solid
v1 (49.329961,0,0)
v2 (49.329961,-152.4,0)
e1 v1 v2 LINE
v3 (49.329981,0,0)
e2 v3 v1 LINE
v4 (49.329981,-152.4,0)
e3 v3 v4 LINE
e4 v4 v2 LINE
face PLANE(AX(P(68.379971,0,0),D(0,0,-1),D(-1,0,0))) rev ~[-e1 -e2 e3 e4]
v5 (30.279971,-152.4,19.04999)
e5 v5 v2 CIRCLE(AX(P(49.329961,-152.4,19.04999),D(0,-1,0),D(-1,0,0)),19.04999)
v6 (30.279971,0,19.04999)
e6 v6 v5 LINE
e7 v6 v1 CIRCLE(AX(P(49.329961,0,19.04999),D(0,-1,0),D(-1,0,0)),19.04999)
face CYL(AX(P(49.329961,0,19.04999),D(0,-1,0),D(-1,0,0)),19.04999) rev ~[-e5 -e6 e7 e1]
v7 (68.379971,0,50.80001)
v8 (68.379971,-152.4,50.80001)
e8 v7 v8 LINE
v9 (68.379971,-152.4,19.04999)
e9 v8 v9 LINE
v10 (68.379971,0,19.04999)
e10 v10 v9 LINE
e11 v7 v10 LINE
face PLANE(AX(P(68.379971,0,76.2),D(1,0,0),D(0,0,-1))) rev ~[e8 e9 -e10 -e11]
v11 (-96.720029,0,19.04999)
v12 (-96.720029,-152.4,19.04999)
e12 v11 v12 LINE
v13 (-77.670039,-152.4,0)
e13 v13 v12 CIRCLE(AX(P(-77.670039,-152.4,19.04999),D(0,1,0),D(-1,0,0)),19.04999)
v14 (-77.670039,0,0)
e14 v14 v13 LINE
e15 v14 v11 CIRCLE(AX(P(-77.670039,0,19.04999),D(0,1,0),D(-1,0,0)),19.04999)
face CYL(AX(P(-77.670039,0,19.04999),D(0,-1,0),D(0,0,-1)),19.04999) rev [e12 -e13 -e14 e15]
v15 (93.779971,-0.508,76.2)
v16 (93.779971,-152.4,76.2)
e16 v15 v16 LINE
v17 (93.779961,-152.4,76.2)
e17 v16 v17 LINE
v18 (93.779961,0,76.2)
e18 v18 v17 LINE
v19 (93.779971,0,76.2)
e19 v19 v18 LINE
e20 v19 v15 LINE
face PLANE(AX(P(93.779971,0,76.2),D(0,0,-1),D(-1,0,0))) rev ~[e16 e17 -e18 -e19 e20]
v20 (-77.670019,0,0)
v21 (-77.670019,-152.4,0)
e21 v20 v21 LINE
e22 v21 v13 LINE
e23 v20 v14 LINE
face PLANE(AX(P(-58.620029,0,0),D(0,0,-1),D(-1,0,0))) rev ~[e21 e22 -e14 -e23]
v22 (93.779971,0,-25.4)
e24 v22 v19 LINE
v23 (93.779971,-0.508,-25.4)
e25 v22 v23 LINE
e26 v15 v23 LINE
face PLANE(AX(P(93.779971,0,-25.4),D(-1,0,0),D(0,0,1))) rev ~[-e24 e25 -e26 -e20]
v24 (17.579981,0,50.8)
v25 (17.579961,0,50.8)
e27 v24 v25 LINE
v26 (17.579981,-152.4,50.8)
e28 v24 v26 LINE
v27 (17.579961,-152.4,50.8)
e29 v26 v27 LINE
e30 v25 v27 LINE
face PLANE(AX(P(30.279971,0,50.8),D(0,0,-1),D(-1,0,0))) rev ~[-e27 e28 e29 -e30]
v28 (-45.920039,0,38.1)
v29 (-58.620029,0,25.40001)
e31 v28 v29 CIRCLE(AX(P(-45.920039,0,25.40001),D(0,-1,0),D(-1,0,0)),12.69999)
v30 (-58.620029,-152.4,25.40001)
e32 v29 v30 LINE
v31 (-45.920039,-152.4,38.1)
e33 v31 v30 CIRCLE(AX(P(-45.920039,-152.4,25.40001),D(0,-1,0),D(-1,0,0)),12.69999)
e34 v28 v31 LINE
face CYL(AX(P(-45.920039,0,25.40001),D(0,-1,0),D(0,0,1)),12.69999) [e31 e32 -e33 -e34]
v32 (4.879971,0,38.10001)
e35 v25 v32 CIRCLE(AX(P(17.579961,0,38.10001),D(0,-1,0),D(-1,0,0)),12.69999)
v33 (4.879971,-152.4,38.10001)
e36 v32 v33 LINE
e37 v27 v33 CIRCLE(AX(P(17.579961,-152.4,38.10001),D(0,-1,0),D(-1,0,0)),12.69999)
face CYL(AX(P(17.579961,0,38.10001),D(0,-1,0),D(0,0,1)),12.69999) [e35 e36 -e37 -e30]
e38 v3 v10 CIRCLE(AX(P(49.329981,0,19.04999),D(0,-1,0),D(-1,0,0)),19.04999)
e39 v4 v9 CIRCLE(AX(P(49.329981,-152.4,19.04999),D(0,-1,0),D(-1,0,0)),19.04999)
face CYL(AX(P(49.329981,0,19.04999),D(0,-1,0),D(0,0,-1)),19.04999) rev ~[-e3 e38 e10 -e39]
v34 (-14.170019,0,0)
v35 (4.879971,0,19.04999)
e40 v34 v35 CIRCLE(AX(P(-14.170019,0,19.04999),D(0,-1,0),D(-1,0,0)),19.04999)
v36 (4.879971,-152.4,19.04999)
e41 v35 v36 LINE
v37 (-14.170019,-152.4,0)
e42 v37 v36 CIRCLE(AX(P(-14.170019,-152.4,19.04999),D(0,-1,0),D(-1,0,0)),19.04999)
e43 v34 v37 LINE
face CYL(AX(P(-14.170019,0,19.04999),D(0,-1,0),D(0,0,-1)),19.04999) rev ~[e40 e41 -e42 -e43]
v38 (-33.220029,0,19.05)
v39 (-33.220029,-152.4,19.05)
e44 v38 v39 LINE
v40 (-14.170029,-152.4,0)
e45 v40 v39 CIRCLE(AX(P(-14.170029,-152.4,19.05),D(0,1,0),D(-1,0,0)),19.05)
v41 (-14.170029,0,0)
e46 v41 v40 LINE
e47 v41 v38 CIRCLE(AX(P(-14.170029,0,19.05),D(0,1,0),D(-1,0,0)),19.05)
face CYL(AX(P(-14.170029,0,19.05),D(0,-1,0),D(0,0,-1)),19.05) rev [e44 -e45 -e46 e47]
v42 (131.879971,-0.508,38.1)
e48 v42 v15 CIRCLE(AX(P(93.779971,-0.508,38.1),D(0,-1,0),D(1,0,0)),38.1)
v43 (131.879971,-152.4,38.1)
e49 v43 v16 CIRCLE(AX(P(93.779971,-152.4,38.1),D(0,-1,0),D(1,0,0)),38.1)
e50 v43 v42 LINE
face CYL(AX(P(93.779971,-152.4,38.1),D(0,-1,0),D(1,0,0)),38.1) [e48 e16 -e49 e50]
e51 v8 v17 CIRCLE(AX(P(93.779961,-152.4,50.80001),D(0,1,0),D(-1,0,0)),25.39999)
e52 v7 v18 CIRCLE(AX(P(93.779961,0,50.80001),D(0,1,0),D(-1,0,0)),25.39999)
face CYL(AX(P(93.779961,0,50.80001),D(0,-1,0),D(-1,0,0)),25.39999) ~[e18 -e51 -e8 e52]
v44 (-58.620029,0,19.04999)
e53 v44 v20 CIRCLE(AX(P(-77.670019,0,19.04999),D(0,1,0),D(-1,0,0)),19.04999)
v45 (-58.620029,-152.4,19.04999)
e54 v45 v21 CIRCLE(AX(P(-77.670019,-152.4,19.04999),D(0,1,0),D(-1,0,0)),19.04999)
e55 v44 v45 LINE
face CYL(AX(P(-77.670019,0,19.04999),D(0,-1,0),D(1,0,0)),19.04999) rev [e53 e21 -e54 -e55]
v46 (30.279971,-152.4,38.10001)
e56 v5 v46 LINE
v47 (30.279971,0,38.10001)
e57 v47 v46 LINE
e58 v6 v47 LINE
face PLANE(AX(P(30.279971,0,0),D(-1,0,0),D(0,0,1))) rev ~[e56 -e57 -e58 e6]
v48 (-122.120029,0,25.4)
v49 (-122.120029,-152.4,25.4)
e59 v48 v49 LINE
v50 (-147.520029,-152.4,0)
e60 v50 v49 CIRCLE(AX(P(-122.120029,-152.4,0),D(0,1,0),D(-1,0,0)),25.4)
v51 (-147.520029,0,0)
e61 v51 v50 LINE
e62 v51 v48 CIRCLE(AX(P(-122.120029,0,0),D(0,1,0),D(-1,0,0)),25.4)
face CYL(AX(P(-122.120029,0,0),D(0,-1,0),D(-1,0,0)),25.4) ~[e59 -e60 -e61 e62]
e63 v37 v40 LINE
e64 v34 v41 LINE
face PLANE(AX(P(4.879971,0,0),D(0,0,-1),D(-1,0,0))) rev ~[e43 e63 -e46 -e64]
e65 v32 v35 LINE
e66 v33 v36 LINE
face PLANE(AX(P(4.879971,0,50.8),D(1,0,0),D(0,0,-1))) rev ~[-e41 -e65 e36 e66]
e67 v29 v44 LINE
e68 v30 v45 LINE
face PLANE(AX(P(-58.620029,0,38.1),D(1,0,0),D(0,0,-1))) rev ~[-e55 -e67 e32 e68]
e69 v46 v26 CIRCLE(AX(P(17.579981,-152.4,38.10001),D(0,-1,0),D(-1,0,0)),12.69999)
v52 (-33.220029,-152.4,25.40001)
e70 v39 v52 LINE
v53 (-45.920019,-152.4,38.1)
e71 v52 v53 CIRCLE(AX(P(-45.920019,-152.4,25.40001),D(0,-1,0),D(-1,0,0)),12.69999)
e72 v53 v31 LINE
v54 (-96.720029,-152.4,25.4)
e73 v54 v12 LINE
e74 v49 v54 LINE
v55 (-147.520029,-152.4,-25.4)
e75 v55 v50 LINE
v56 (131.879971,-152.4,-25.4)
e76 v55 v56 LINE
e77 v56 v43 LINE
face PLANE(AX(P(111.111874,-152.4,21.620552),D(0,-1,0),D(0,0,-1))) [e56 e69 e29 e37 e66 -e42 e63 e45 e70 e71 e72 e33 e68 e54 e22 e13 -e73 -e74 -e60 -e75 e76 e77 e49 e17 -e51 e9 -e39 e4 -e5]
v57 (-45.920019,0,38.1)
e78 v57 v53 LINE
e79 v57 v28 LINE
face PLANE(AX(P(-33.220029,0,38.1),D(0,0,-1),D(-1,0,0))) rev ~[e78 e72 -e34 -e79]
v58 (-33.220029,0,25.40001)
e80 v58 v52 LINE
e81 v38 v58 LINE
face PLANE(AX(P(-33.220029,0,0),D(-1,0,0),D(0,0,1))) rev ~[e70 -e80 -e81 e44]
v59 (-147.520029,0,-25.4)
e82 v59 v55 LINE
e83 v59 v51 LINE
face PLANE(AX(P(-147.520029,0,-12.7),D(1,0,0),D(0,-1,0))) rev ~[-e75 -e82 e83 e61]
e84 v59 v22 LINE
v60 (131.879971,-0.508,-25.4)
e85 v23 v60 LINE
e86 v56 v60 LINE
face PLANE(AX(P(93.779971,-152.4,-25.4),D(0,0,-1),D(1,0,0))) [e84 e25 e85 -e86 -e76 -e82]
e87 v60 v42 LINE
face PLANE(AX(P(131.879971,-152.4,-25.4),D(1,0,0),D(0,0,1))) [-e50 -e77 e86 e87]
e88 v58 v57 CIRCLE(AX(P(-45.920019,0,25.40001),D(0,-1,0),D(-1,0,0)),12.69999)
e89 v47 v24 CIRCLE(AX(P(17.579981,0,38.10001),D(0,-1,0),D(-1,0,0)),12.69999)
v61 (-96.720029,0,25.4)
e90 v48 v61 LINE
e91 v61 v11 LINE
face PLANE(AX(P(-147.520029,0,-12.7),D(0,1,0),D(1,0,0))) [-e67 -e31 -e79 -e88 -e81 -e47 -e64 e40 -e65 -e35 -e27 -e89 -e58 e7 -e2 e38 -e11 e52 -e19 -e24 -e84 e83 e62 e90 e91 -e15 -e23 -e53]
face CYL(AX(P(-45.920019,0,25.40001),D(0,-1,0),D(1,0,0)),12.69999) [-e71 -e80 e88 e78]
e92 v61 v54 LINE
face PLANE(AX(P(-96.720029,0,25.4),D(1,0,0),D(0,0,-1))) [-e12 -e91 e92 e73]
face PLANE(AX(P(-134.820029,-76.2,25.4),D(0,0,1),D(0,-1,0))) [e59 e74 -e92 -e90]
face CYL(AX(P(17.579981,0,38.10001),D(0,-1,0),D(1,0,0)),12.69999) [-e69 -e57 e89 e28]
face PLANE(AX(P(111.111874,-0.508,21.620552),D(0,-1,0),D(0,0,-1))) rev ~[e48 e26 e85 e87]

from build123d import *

# Parameters (mm, degrees)
F0_W      = 12.7
F0_H      = 25.4
F0_W_2    = 25.4
F1_DEPTH  = 152.4
F2_W      = 152.4
F2_H      = 25.4
F3_DEPTH  = 38.1
F4_R      = 25.4
F6_DEPTH  = 151.892
F7_R      = 19.05
F8_R      = 19.04999
F9_R      = 19.04999
F10_R     = 12.69999
F11_R     = 25.39999
F12_ANGLE = 90


# Not quite as in the source:
# - a fillet or chamfer is up to 0.001 mm smaller than in the source, because OpenCascade refuses the exact size


with BuildPart() as f1:
    # F0 (on Front) → F1 (new body)
    with BuildSketch(Plane.XZ):
        Polygon((-147.5200289965, 215.9), (-172.9200289965, 215.9), (-249.1200289965, 215.9), (-249.1200289965, 190.5), (-172.9200289965, 190.5), (-172.9200289965, 152.4), (-223.7200289965, 152.4), (-223.7200289965, 127), (-172.9200289965, 127), (-172.9200289965, 88.9), (-211.0200289965, 88.9), (-211.0200289965, 63.5), (-172.9200289965, 63.5), (-172.9200289965, 25.4), (-172.9200289965, 0), (-160.2200289965, 0), (-147.5200289965, 0), (-147.5200289965, 63.5), (-147.5200289965, 88.9), (-147.5200289965, 127), (-147.5200289965, 152.4), (-147.5200289965, 190.5), align=None)
        with Locations((-153.8700289965, -12.7)):
            Rectangle(F0_W, F0_H)
        with Locations((-185.6200289965, 12.7)):
            Rectangle(F0_W_2, F0_H)
    extrude(amount=F1_DEPTH)

    # F2 (on face) → F3 (join)
    with BuildSketch(Plane(origin=(-160.2200289965, 0, 0), x_dir=(0, -1, 0), z_dir=(-1, 0, 0))):
        with Locations((76.2, -12.7)):
            Rectangle(F2_W, F2_H)
    extrude(amount=F3_DEPTH)

    # F4
    f4_edges = [f1.edges().sort_by_distance(p)[0] for p in [
        (-198.320029, -76.2, -25.4),
    ]]
    fillet(f4_edges, radius=F4_R)

    # F5 (on face) → F6 (join)
    with BuildSketch(Plane.XZ.offset(152.4)):
        with BuildLine():
            ThreePointArc((-211.0200289965, 254), (-237.9607973597, 242.8407683632), (-249.1200289965, 215.9))
            Line((-249.1200289965, 215.9), (-147.5200289965, 215.9))
            Line((-147.5200289965, 215.9), (-147.5200289965, 254))
            Line((-147.5200289965, 254), (-211.0200289965, 254))
        make_face()
    extrude(amount=-F6_DEPTH)

    # F7
    f7_edges = [f1.edges().sort_by_distance(p)[0] for p in [
        (-172.920029, -76.2, 88.9),
    ]]
    fillet(f7_edges, radius=F7_R)

    # F8 (radius 19.05 in the source; OpenCascade refuses exactly that, so slightly less here)
    f8_edges = [f1.edges().sort_by_distance(p)[0] for p in [
        (-172.920029, -76.2, 190.5),
        (-172.920029, -76.2, 127),
    ]]
    fillet(f8_edges, radius=F8_R)

    # F9 (radius 19.05 in the source; OpenCascade refuses exactly that, so slightly less here)
    f9_edges = [f1.edges().sort_by_distance(p)[0] for p in [
        (-172.920029, -76.2, 152.4),
        (-172.920029, -76.2, 25.4),
        (-172.920029, -76.2, 63.5),
    ]]
    fillet(f9_edges, radius=F9_R)

    # F10 (radius 12.7 in the source; OpenCascade refuses exactly that, so slightly less here)
    f10_edges = [f1.edges().sort_by_distance(p)[0] for p in [
        (-223.720029, -76.2, 152.4),
        (-223.720029, -76.2, 127),
        (-211.020029, -76.2, 88.9),
        (-211.020029, -76.2, 63.5),
    ]]
    fillet(f10_edges, radius=F10_R)

    # F11 (radius 25.4 in the source; OpenCascade refuses exactly that, so slightly less here)
    f11_edges = [f1.edges().sort_by_distance(p)[0] for p in [
        (-249.120029, -76.2, 190.5),
    ]]
    fillet(f11_edges, radius=F11_R)


with BuildPart() as f1_1:
    # F12: moved
    add(f1.part.rotate(Axis((-147.5200289965, -76.2, -25.4), (0, 1, 0)), F12_ANGLE))


solid = f1_1.part
